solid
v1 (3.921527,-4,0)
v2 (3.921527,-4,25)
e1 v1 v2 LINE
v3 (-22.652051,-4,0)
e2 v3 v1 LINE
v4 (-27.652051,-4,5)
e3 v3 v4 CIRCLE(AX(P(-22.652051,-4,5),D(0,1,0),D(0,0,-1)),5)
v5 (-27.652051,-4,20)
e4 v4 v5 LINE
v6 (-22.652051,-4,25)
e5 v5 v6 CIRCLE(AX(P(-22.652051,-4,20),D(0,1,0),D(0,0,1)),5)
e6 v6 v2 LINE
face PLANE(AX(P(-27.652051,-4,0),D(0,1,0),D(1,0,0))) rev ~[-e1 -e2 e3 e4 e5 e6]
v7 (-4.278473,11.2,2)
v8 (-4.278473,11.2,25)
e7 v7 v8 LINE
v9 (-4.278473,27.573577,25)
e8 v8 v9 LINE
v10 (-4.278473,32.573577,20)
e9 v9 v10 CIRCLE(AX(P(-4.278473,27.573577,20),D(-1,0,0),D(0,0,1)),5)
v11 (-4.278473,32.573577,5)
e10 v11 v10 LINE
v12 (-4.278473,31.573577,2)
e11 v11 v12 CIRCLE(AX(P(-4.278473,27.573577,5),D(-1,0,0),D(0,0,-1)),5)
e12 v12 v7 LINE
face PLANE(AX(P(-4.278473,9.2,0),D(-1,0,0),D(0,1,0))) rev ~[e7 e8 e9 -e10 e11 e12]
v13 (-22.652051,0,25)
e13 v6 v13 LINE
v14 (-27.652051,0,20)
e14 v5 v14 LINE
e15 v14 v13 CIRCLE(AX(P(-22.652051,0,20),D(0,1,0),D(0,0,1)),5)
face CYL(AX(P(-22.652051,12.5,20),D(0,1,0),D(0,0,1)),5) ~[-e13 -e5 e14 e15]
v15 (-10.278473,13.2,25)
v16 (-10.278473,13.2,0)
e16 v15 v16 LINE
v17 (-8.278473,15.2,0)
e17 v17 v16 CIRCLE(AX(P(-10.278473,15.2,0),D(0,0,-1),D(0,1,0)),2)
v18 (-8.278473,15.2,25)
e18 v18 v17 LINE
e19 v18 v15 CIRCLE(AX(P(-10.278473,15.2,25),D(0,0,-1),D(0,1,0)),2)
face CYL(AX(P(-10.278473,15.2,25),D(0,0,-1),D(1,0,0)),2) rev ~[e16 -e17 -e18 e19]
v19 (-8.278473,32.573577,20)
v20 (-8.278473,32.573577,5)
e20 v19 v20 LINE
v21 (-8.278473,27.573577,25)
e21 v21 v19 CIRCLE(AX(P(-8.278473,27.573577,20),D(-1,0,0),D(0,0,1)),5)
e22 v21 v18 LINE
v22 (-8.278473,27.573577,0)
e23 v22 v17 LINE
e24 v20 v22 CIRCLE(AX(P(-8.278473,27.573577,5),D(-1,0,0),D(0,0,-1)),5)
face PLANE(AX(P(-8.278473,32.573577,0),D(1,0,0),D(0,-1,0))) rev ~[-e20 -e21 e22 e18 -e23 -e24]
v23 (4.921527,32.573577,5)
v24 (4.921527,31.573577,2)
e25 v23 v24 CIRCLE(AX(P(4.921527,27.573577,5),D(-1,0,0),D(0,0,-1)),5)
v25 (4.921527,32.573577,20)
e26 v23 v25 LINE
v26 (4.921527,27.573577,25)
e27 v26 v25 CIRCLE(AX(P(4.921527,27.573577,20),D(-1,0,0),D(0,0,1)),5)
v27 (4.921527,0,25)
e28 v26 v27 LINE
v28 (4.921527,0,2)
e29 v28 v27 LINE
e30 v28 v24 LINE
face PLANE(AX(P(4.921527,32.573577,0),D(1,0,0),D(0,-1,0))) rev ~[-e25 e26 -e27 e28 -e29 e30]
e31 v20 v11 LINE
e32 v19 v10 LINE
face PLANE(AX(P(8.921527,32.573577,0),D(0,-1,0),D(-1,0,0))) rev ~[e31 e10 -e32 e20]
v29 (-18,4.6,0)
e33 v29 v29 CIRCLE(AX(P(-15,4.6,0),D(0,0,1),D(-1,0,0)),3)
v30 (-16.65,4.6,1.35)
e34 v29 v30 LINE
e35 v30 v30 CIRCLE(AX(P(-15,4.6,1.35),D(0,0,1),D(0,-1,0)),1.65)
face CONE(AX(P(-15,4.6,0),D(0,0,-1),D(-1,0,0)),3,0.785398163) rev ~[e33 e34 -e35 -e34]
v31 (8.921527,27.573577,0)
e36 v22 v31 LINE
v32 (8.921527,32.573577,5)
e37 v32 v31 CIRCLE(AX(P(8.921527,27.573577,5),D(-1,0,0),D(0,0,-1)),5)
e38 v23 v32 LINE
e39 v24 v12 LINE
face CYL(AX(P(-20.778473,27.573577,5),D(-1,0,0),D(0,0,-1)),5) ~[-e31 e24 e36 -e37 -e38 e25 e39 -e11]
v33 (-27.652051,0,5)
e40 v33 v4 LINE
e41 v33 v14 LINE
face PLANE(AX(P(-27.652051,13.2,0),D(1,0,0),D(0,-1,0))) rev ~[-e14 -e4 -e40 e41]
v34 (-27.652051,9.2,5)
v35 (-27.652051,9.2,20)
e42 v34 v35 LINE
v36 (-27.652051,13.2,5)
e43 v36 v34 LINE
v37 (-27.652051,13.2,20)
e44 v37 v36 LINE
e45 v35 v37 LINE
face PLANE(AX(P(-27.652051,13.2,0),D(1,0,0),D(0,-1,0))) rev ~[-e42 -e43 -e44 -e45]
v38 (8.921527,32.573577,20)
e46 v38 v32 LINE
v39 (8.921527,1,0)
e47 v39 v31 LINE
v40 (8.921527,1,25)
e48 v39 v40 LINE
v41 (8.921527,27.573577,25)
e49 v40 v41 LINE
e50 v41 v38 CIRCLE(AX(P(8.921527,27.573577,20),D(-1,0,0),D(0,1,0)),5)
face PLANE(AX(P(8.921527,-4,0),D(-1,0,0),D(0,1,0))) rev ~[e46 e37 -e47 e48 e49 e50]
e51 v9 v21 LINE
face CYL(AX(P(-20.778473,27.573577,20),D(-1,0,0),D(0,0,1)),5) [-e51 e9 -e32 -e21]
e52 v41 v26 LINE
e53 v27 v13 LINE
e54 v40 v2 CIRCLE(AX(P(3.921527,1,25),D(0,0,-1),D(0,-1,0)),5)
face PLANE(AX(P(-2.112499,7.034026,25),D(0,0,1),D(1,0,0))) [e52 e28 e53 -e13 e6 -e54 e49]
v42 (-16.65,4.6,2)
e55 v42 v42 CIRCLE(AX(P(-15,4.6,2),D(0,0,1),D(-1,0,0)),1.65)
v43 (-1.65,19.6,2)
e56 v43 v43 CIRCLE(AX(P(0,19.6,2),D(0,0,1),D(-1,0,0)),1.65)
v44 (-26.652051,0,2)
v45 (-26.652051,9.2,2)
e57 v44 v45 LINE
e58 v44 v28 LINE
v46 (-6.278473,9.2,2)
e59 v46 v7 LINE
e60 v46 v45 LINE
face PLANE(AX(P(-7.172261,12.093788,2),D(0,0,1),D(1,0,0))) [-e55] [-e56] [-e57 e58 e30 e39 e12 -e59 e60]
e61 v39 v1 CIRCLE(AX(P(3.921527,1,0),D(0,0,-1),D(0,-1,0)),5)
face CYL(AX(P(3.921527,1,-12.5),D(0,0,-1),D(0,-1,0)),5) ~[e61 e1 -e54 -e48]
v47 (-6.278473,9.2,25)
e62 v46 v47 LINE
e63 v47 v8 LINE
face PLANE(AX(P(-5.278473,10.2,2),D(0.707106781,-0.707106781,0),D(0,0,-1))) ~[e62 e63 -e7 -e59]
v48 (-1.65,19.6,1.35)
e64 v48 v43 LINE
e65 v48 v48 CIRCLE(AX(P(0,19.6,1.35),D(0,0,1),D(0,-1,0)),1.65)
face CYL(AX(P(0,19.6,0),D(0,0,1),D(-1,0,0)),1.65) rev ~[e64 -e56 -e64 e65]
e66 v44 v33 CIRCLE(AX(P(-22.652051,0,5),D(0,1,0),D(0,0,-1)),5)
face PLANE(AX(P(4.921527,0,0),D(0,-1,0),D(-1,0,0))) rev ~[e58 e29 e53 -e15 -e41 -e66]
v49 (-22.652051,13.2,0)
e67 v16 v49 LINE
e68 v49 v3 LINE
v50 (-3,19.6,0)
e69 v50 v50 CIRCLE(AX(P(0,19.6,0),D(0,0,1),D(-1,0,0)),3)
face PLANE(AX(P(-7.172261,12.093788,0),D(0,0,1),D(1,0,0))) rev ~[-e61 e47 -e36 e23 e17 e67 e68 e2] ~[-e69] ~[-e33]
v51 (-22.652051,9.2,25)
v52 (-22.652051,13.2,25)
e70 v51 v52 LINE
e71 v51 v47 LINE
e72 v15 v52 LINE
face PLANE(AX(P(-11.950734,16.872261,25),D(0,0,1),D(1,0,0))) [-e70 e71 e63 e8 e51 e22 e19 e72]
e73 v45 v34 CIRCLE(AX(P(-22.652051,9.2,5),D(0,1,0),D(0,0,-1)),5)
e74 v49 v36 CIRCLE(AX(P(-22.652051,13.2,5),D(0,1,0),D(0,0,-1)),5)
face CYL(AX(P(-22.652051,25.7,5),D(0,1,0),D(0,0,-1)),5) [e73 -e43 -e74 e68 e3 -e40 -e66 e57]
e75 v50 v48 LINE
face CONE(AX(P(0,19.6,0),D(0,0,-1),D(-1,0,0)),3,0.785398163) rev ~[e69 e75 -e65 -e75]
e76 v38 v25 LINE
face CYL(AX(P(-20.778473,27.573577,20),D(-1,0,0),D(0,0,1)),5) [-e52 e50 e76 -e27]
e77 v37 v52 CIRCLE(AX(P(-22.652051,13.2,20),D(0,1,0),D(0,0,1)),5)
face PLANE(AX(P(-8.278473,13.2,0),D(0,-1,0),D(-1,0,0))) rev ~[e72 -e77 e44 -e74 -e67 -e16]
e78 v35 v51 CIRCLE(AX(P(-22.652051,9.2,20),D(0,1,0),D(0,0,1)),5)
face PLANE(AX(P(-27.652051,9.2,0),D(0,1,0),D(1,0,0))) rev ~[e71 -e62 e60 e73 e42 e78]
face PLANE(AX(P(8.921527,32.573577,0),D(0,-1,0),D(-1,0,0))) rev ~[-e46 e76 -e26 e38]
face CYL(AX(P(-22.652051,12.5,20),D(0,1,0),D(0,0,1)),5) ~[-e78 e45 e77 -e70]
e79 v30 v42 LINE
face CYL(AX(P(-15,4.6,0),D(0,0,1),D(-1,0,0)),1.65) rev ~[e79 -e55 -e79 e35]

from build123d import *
from build123d import SkipClean  # not in build123d's __all__

# Parameters (mm, degrees)
F1_DEPTH       = 2
F2_DEPTH       = 25
F3_T1_DEPTH    = 29
F3_T3_DEPTH    = 29
F3_T5_DEPTH    = 29
F3_T7_DEPTH    = 29
F3_T9_DEPTH    = 42.2
F3_T11_DEPTH   = 42.2
F3_T13_DEPTH   = 50
F4_R           = 2
F5_SIZE        = 2
F7_D           = 3.3
F7_CSINK_D     = 6
F7_CSINK_ANGLE = 90


# Not quite as in the source:
# - a fillet or chamfer that OpenCascade refuses, or shapes differently, is made with other operations: its cross-section is extruded or revolved along the edge and cut away or added
# - a feature names something its author has since deleted; it is built from what else it names


with BuildPart() as f1:
    # F0 (on Top) → F1 (new body)
    with BuildSketch(Plane.XY):
        Polygon((4.9215265818, 0), (4.9215265818, 9.2), (4.9215265818, 32.5735770881), (-4.2784734182, 32.5735770881), (-4.2784734182, 9.2), (-27.6520505063, 9.2), (-27.6520505063, 0), (0, 0), align=None)
        Polygon((4.9215265818, 32.5735770881), (4.9215265818, 9.2), (4.9215265818, 0), (0, 0), (-27.6520505063, 0), (-27.6520505063, -4), (0, -4), (8.9215265818, -4), (8.9215265818, 32.5735770881), align=None)
        Polygon((-4.2784734182, 9.2), (-4.2784734182, 32.5735770881), (-8.2784734182, 32.5735770881), (-8.2784734182, 13.2), (-27.6520505063, 13.2), (-27.6520505063, 9.2), align=None)
    extrude(amount=F1_DEPTH)

    # F0 (on Top) → F2 (join)
    with BuildSketch(Plane.XY):
        Polygon((-4.2784734182, 9.2), (-4.2784734182, 32.5735770881), (-8.2784734182, 32.5735770881), (-8.2784734182, 13.2), (-27.6520505063, 13.2), (-27.6520505063, 9.2), align=None)
        Polygon((4.9215265818, 32.5735770881), (4.9215265818, 9.2), (4.9215265818, 0), (0, 0), (-27.6520505063, 0), (-27.6520505063, -4), (0, -4), (8.9215265818, -4), (8.9215265818, 32.5735770881), align=None)
    extrude(amount=F2_DEPTH)

    # F3: fillet of radius 5 on 7 edges, made by hand

    # F3_s2 → F3_t1 (cut)
    with BuildSketch(Plane.XZ.offset(-12.5)):
        with BuildLine():
            ThreePointArc((-22.6520505063, 25), (-26.1875844123, 23.5355339059), (-27.6520505063, 20))
            Line((-27.6520505063, 20), (-27.6520505063, 25))
            Line((-27.6520505063, 25), (-22.6520505063, 25))
        make_face()
    extrude(amount=F3_T1_DEPTH, mode=Mode.SUBTRACT)

    # F3_s4 → F3_t3 (cut)
    with BuildSketch(Plane.XZ.offset(-25.7)):
        with BuildLine():
            ThreePointArc((-22.6520505063, 25), (-26.1875844123, 23.5355339059), (-27.6520505063, 20))
            Line((-27.6520505063, 20), (-27.6520505063, 25))
            Line((-27.6520505063, 25), (-22.6520505063, 25))
        make_face()
    extrude(amount=F3_T3_DEPTH, mode=Mode.SUBTRACT)

    # F3_s6 → F3_t5 (cut)
    with BuildSketch(Plane.YZ.offset(-20.7784734182)):
        with BuildLine():
            ThreePointArc((27.5735770881, 25), (31.1091109941, 23.5355339059), (32.5735770881, 20))
            Line((32.5735770881, 20), (32.5735770881, 25))
            Line((32.5735770881, 25), (27.5735770881, 25))
        make_face()
    extrude(amount=F3_T5_DEPTH, mode=Mode.SUBTRACT)

    # F3_s8 → F3_t7 (cut)
    with BuildSketch(Plane.YZ.offset(-7.5784734182)):
        with BuildLine():
            ThreePointArc((32.5735770881, 20), (31.1091109941, 23.5355339059), (27.5735770881, 25))
            Line((27.5735770881, 25), (32.5735770881, 25))
            Line((32.5735770881, 25), (32.5735770881, 20))
        make_face()
    with SkipClean():  # cleaning this boolean's faces spoils the solid; the shape is the same uncleaned
        extrude(amount=F3_T7_DEPTH, mode=Mode.SUBTRACT)

    # F3_s10 → F3_t9 (cut)
    with BuildSketch(Plane.XZ.offset(-25.7)):
        with BuildLine():
            ThreePointArc((-22.6520505063, 0), (-26.1875844123, 1.4644660941), (-27.6520505063, 5))
            Line((-27.6520505063, 5), (-27.6520505063, 0))
            Line((-27.6520505063, 0), (-22.6520505063, 0))
        make_face()
    extrude(amount=F3_T9_DEPTH, mode=Mode.SUBTRACT)

    # F3_s12 → F3_t11 (cut)
    with BuildSketch(Plane.YZ.offset(-20.7784734182)):
        with BuildLine():
            ThreePointArc((27.5735770881, 0), (31.1091109941, 1.4644660941), (32.5735770881, 5))
            Line((32.5735770881, 5), (32.5735770881, 0))
            Line((32.5735770881, 0), (27.5735770881, 0))
        make_face()
    extrude(amount=F3_T11_DEPTH, mode=Mode.SUBTRACT)

    # F3_s14 → F3_t13 (cut)
    with BuildSketch(Plane.XY.offset(-12.5)):
        with BuildLine():
            ThreePointArc((3.9215265818, -4), (7.4570604877, -2.5355339059), (8.9215265818, 1))
            Line((8.9215265818, 1), (8.9215265818, -4))
            Line((8.9215265818, -4), (3.9215265818, -4))
        make_face()
    extrude(amount=F3_T13_DEPTH, mode=Mode.SUBTRACT)

    # F4
    f4_edges = [f1.edges().sort_by_distance(p)[0] for p in [
        (-8.278473, 13.2, 12.5),
    ]]
    fillet(f4_edges, radius=F4_R)

    # F5
    f5_edges = [f1.edges().sort_by_distance(p)[0] for p in [
        (-4.278473, 9.2, 13.5),
    ]]
    chamfer(f5_edges, length=F5_SIZE)

    # F7 (through all)
    with Locations(Plane(origin=(0, 0, 0), x_dir=(1, 0, 0), z_dir=(0, 0, -1))):
        with Locations((-15, -4.6), (0, -19.6)):
            CounterSinkHole(F7_D / 2, F7_CSINK_D / 2, counter_sink_angle=F7_CSINK_ANGLE)


solid = f1.part
